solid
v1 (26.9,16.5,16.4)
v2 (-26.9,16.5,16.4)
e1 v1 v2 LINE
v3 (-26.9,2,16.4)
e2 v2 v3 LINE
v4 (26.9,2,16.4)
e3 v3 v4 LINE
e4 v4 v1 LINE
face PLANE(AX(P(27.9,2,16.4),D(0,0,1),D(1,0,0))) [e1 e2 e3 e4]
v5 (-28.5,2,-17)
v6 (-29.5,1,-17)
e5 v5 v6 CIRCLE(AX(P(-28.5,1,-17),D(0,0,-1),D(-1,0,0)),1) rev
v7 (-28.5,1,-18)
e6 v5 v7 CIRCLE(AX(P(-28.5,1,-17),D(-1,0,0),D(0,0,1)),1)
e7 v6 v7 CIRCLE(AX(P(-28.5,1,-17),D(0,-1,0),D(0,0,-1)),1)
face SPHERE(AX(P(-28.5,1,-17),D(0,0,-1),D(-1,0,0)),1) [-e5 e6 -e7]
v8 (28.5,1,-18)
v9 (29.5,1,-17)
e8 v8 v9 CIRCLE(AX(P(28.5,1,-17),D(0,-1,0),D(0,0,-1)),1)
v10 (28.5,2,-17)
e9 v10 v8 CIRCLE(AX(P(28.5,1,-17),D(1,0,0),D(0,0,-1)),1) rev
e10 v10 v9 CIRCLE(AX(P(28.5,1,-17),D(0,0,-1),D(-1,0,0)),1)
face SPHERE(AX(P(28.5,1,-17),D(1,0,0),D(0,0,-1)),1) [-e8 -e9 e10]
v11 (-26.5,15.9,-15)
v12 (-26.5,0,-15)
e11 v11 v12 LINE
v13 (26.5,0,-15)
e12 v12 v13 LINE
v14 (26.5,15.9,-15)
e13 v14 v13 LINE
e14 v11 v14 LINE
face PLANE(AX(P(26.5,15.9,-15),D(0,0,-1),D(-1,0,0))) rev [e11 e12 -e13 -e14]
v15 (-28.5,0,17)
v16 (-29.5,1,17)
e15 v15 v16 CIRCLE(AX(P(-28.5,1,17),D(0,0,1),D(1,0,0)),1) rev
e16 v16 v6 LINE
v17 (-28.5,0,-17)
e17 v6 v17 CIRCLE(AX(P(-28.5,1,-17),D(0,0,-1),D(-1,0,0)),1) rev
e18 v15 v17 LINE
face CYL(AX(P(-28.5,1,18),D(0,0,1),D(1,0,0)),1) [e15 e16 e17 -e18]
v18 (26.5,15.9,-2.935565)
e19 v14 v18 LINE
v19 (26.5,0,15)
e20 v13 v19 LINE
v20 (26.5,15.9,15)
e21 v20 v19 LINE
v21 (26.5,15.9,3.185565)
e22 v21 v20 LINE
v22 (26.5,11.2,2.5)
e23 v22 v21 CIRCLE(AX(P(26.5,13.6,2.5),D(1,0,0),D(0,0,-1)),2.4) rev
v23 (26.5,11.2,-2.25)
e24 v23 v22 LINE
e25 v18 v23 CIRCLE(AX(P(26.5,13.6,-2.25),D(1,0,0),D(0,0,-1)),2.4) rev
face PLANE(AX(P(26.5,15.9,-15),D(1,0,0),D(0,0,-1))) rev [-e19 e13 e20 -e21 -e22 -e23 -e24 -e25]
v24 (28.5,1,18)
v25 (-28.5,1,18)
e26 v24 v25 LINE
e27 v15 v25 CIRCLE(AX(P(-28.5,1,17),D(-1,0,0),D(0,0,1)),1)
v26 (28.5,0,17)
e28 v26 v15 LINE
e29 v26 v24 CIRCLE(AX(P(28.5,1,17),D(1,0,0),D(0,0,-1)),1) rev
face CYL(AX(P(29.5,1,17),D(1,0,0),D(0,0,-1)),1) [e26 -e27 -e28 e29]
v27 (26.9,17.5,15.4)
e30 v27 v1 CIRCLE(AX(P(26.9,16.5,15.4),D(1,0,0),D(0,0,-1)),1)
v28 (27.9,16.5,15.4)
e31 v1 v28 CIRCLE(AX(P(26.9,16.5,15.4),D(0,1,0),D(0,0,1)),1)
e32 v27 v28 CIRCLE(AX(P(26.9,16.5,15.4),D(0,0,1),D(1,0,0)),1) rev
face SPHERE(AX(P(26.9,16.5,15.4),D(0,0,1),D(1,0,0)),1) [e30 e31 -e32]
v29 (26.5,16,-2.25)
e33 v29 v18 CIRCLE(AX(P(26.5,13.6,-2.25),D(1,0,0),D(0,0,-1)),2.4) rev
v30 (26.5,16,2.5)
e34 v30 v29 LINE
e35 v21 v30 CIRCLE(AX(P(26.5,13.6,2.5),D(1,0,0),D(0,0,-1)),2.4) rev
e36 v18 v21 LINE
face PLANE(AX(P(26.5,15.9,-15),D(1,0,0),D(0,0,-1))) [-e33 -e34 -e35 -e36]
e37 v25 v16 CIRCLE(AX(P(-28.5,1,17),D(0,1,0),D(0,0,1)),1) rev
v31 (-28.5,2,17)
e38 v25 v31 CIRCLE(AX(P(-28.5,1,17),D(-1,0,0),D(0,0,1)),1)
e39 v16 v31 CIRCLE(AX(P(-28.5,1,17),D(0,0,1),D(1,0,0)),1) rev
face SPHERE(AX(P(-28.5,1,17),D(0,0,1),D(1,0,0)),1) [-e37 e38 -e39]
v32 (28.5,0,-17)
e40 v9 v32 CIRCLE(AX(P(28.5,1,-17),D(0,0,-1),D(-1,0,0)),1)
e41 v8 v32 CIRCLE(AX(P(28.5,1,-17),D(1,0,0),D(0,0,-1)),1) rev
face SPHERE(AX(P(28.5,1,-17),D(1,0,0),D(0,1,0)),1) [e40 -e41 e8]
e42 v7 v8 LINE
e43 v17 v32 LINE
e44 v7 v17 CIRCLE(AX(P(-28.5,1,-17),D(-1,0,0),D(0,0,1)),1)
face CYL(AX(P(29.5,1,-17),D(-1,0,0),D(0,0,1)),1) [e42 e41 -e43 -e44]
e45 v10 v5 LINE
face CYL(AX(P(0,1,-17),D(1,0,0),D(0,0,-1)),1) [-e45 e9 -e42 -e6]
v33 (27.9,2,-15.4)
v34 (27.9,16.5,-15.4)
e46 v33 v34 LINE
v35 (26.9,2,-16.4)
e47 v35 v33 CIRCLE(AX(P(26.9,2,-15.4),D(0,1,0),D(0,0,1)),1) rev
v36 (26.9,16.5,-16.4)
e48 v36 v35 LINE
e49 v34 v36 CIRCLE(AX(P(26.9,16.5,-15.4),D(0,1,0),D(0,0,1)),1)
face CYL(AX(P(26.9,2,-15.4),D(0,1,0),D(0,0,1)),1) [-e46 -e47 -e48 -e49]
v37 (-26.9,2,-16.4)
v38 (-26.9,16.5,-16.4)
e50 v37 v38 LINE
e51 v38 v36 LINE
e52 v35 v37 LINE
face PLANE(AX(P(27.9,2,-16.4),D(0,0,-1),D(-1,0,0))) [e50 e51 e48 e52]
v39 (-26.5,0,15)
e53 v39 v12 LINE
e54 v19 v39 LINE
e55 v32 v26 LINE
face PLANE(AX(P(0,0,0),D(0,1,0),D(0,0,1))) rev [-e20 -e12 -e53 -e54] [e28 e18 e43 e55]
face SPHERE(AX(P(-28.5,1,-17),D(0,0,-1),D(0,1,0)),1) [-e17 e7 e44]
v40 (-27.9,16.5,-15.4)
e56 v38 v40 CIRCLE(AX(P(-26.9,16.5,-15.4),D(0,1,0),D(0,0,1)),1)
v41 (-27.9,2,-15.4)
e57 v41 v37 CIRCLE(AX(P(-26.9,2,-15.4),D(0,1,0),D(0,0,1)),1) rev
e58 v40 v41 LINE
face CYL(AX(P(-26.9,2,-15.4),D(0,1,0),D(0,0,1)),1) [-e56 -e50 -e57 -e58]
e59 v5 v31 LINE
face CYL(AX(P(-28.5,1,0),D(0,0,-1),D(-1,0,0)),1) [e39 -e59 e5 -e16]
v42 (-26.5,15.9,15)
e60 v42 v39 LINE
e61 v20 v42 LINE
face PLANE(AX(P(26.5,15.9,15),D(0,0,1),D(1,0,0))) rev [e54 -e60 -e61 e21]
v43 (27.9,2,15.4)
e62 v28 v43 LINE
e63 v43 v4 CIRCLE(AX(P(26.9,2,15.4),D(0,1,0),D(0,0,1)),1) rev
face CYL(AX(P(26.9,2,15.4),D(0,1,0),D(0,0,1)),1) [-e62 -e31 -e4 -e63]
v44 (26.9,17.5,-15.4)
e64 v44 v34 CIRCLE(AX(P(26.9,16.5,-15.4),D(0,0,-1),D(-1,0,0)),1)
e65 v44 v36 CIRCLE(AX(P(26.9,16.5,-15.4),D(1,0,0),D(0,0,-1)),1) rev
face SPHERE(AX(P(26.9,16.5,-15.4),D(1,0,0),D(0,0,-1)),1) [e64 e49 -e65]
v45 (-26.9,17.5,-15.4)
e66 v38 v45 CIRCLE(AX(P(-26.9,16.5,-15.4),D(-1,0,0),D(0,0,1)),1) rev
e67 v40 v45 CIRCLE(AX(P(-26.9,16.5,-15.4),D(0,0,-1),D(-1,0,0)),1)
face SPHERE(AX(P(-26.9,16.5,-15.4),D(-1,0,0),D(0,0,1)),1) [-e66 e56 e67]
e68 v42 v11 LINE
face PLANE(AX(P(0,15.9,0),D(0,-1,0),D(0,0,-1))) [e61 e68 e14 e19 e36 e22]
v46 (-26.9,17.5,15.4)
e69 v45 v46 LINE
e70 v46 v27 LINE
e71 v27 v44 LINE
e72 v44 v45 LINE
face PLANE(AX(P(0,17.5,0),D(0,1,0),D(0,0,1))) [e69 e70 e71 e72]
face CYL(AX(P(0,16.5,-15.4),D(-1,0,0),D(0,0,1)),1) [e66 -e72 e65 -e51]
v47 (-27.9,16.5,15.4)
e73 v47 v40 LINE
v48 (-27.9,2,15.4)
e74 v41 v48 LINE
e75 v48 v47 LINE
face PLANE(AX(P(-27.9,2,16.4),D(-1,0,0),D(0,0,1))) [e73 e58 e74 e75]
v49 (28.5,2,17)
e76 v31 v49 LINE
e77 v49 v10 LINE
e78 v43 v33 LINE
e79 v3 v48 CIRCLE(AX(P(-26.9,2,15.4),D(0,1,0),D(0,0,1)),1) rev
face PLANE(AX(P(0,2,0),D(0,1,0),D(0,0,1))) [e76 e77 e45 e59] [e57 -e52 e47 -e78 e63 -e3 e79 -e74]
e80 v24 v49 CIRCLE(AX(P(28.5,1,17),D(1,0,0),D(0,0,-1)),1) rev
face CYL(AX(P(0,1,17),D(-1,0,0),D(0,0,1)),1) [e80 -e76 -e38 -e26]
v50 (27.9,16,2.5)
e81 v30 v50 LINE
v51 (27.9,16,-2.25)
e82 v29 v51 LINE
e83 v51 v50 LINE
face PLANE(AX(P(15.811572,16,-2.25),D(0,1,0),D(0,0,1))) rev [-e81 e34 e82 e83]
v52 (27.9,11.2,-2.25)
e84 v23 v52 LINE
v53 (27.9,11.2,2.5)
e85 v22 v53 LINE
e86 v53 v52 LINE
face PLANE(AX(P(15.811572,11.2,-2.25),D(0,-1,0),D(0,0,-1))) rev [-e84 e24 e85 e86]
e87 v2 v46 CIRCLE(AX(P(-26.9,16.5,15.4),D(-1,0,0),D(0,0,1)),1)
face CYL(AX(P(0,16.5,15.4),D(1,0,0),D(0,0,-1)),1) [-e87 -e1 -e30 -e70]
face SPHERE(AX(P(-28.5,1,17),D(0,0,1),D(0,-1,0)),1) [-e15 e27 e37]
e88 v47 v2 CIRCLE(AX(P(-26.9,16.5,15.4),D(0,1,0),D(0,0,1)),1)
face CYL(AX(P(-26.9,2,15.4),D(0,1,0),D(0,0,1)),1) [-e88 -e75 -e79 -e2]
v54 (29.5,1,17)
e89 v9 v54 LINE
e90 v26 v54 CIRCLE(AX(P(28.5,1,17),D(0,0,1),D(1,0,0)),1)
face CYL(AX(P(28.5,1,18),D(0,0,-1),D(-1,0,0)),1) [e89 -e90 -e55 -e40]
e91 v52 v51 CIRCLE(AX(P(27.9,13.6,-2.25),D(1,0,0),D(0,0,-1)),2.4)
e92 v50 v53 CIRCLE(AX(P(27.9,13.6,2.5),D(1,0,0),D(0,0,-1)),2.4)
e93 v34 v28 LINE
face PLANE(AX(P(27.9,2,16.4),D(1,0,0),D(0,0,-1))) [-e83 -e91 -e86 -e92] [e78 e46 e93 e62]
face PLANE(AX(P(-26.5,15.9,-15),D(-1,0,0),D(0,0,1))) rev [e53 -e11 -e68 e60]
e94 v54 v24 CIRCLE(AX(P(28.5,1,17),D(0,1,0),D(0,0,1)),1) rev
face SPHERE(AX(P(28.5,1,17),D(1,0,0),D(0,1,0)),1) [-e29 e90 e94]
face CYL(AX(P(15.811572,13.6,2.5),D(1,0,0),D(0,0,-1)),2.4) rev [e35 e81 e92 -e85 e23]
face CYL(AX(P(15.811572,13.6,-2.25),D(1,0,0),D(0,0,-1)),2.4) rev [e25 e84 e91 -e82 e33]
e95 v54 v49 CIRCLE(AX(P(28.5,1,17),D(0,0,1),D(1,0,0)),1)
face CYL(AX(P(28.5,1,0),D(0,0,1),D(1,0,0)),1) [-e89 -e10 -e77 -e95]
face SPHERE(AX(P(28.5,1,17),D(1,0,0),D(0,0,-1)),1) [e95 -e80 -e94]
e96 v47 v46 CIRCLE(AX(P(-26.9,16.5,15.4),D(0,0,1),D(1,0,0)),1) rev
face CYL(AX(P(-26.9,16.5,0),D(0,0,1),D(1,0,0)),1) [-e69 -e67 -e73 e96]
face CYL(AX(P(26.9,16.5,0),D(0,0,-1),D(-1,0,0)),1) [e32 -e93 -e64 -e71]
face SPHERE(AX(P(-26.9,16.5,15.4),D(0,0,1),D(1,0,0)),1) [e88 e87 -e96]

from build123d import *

# Parameters (mm, degrees)
SKETCH1_W           = 59
SKETCH1_H           = 36
BOSS_EXTRUDE1_DEPTH = 17.5
SKETCH2_W           = 53
SKETCH2_H           = 30
CUT_EXTRUDE1_DEPTH  = 15.9
SKETCH3_OUTSIDE_W   = 75.26
SKETCH3_OUTSIDE_H   = 52.26
SKETCH3_OUTSIDE_W_2 = 55.8
SKETCH3_OUTSIDE_H_2 = 32.8
CUT_EXTRUDE2_DEPTH  = 15.5
CUT_EXTRUDE3_DEPTH  = 1.4
FILLET1_R           = 1


with BuildPart() as part:
    # Sketch1 → Boss-Extrude1 (new body)
    with BuildSketch(Plane(origin=(0, 0, 0), x_dir=(1, 0, 0), z_dir=(0, 1, 0))):
        Rectangle(SKETCH1_W, SKETCH1_H)
    extrude(amount=BOSS_EXTRUDE1_DEPTH)

    # Sketch2 → Cut-Extrude1 (cut)
    with BuildSketch(Plane.XZ):
        Rectangle(SKETCH2_W, SKETCH2_H)
    extrude(amount=-CUT_EXTRUDE1_DEPTH, mode=Mode.SUBTRACT)

    # Sketch3 outside → Cut-Extrude2 (cut)
    with BuildSketch(Plane(origin=(0, 17.5, 0), x_dir=(1, 0, 0), z_dir=(0, 1, 0))):
        Rectangle(SKETCH3_OUTSIDE_W, SKETCH3_OUTSIDE_H)
        Rectangle(SKETCH3_OUTSIDE_W_2, SKETCH3_OUTSIDE_H_2, mode=Mode.SUBTRACT)
    extrude(amount=-CUT_EXTRUDE2_DEPTH, mode=Mode.SUBTRACT)

    # Sketch4 → Cut-Extrude3 (cut)
    with BuildSketch(Plane(origin=(27.9, 0, 0), x_dir=(0, 0, -1), z_dir=(1, 0, 0))):
        with BuildLine():
            Line((2.25, 16), (-2.5, 16))
            ThreePointArc((-2.5, 16), (-4.9, 13.6), (-2.5, 11.2))
            Line((-2.5, 11.2), (2.25, 11.2))
            ThreePointArc((2.25, 11.2), (4.65, 13.6), (2.25, 16))
        make_face()
    extrude(amount=-CUT_EXTRUDE3_DEPTH, mode=Mode.SUBTRACT)

    # Fillet1
    fillet1_edges = [part.edges().sort_by_distance(p)[0] for p in [
        (-29.5, 1, -18),
        (29.5, 1, -18),
        (0, 2, -18),
        (29.5, 1, 18),
        (-29.5, 1, 18),
        (-29.5, 2, 0),
        (0, 2, 18),
        (29.5, 2, 0),
        (-27.9, 17.5, 0),
        (-27.9, 9.75, -16.4),
        (0, 17.5, -16.4),
        (27.9, 9.75, -16.4),
        (27.9, 17.5, 0),
        (27.9, 9.75, 16.4),
        (0, 17.5, 16.4),
        (-27.9, 9.75, 16.4),
        (0, 0, -18),
        (29.5, 0, 0),
        (0, 0, 18),
        (-29.5, 0, 0),
    ]]
    fillet(fillet1_edges, radius=FILLET1_R - 0.0001)  # a hair under: the kernel refuses the full size


solid = part.part
